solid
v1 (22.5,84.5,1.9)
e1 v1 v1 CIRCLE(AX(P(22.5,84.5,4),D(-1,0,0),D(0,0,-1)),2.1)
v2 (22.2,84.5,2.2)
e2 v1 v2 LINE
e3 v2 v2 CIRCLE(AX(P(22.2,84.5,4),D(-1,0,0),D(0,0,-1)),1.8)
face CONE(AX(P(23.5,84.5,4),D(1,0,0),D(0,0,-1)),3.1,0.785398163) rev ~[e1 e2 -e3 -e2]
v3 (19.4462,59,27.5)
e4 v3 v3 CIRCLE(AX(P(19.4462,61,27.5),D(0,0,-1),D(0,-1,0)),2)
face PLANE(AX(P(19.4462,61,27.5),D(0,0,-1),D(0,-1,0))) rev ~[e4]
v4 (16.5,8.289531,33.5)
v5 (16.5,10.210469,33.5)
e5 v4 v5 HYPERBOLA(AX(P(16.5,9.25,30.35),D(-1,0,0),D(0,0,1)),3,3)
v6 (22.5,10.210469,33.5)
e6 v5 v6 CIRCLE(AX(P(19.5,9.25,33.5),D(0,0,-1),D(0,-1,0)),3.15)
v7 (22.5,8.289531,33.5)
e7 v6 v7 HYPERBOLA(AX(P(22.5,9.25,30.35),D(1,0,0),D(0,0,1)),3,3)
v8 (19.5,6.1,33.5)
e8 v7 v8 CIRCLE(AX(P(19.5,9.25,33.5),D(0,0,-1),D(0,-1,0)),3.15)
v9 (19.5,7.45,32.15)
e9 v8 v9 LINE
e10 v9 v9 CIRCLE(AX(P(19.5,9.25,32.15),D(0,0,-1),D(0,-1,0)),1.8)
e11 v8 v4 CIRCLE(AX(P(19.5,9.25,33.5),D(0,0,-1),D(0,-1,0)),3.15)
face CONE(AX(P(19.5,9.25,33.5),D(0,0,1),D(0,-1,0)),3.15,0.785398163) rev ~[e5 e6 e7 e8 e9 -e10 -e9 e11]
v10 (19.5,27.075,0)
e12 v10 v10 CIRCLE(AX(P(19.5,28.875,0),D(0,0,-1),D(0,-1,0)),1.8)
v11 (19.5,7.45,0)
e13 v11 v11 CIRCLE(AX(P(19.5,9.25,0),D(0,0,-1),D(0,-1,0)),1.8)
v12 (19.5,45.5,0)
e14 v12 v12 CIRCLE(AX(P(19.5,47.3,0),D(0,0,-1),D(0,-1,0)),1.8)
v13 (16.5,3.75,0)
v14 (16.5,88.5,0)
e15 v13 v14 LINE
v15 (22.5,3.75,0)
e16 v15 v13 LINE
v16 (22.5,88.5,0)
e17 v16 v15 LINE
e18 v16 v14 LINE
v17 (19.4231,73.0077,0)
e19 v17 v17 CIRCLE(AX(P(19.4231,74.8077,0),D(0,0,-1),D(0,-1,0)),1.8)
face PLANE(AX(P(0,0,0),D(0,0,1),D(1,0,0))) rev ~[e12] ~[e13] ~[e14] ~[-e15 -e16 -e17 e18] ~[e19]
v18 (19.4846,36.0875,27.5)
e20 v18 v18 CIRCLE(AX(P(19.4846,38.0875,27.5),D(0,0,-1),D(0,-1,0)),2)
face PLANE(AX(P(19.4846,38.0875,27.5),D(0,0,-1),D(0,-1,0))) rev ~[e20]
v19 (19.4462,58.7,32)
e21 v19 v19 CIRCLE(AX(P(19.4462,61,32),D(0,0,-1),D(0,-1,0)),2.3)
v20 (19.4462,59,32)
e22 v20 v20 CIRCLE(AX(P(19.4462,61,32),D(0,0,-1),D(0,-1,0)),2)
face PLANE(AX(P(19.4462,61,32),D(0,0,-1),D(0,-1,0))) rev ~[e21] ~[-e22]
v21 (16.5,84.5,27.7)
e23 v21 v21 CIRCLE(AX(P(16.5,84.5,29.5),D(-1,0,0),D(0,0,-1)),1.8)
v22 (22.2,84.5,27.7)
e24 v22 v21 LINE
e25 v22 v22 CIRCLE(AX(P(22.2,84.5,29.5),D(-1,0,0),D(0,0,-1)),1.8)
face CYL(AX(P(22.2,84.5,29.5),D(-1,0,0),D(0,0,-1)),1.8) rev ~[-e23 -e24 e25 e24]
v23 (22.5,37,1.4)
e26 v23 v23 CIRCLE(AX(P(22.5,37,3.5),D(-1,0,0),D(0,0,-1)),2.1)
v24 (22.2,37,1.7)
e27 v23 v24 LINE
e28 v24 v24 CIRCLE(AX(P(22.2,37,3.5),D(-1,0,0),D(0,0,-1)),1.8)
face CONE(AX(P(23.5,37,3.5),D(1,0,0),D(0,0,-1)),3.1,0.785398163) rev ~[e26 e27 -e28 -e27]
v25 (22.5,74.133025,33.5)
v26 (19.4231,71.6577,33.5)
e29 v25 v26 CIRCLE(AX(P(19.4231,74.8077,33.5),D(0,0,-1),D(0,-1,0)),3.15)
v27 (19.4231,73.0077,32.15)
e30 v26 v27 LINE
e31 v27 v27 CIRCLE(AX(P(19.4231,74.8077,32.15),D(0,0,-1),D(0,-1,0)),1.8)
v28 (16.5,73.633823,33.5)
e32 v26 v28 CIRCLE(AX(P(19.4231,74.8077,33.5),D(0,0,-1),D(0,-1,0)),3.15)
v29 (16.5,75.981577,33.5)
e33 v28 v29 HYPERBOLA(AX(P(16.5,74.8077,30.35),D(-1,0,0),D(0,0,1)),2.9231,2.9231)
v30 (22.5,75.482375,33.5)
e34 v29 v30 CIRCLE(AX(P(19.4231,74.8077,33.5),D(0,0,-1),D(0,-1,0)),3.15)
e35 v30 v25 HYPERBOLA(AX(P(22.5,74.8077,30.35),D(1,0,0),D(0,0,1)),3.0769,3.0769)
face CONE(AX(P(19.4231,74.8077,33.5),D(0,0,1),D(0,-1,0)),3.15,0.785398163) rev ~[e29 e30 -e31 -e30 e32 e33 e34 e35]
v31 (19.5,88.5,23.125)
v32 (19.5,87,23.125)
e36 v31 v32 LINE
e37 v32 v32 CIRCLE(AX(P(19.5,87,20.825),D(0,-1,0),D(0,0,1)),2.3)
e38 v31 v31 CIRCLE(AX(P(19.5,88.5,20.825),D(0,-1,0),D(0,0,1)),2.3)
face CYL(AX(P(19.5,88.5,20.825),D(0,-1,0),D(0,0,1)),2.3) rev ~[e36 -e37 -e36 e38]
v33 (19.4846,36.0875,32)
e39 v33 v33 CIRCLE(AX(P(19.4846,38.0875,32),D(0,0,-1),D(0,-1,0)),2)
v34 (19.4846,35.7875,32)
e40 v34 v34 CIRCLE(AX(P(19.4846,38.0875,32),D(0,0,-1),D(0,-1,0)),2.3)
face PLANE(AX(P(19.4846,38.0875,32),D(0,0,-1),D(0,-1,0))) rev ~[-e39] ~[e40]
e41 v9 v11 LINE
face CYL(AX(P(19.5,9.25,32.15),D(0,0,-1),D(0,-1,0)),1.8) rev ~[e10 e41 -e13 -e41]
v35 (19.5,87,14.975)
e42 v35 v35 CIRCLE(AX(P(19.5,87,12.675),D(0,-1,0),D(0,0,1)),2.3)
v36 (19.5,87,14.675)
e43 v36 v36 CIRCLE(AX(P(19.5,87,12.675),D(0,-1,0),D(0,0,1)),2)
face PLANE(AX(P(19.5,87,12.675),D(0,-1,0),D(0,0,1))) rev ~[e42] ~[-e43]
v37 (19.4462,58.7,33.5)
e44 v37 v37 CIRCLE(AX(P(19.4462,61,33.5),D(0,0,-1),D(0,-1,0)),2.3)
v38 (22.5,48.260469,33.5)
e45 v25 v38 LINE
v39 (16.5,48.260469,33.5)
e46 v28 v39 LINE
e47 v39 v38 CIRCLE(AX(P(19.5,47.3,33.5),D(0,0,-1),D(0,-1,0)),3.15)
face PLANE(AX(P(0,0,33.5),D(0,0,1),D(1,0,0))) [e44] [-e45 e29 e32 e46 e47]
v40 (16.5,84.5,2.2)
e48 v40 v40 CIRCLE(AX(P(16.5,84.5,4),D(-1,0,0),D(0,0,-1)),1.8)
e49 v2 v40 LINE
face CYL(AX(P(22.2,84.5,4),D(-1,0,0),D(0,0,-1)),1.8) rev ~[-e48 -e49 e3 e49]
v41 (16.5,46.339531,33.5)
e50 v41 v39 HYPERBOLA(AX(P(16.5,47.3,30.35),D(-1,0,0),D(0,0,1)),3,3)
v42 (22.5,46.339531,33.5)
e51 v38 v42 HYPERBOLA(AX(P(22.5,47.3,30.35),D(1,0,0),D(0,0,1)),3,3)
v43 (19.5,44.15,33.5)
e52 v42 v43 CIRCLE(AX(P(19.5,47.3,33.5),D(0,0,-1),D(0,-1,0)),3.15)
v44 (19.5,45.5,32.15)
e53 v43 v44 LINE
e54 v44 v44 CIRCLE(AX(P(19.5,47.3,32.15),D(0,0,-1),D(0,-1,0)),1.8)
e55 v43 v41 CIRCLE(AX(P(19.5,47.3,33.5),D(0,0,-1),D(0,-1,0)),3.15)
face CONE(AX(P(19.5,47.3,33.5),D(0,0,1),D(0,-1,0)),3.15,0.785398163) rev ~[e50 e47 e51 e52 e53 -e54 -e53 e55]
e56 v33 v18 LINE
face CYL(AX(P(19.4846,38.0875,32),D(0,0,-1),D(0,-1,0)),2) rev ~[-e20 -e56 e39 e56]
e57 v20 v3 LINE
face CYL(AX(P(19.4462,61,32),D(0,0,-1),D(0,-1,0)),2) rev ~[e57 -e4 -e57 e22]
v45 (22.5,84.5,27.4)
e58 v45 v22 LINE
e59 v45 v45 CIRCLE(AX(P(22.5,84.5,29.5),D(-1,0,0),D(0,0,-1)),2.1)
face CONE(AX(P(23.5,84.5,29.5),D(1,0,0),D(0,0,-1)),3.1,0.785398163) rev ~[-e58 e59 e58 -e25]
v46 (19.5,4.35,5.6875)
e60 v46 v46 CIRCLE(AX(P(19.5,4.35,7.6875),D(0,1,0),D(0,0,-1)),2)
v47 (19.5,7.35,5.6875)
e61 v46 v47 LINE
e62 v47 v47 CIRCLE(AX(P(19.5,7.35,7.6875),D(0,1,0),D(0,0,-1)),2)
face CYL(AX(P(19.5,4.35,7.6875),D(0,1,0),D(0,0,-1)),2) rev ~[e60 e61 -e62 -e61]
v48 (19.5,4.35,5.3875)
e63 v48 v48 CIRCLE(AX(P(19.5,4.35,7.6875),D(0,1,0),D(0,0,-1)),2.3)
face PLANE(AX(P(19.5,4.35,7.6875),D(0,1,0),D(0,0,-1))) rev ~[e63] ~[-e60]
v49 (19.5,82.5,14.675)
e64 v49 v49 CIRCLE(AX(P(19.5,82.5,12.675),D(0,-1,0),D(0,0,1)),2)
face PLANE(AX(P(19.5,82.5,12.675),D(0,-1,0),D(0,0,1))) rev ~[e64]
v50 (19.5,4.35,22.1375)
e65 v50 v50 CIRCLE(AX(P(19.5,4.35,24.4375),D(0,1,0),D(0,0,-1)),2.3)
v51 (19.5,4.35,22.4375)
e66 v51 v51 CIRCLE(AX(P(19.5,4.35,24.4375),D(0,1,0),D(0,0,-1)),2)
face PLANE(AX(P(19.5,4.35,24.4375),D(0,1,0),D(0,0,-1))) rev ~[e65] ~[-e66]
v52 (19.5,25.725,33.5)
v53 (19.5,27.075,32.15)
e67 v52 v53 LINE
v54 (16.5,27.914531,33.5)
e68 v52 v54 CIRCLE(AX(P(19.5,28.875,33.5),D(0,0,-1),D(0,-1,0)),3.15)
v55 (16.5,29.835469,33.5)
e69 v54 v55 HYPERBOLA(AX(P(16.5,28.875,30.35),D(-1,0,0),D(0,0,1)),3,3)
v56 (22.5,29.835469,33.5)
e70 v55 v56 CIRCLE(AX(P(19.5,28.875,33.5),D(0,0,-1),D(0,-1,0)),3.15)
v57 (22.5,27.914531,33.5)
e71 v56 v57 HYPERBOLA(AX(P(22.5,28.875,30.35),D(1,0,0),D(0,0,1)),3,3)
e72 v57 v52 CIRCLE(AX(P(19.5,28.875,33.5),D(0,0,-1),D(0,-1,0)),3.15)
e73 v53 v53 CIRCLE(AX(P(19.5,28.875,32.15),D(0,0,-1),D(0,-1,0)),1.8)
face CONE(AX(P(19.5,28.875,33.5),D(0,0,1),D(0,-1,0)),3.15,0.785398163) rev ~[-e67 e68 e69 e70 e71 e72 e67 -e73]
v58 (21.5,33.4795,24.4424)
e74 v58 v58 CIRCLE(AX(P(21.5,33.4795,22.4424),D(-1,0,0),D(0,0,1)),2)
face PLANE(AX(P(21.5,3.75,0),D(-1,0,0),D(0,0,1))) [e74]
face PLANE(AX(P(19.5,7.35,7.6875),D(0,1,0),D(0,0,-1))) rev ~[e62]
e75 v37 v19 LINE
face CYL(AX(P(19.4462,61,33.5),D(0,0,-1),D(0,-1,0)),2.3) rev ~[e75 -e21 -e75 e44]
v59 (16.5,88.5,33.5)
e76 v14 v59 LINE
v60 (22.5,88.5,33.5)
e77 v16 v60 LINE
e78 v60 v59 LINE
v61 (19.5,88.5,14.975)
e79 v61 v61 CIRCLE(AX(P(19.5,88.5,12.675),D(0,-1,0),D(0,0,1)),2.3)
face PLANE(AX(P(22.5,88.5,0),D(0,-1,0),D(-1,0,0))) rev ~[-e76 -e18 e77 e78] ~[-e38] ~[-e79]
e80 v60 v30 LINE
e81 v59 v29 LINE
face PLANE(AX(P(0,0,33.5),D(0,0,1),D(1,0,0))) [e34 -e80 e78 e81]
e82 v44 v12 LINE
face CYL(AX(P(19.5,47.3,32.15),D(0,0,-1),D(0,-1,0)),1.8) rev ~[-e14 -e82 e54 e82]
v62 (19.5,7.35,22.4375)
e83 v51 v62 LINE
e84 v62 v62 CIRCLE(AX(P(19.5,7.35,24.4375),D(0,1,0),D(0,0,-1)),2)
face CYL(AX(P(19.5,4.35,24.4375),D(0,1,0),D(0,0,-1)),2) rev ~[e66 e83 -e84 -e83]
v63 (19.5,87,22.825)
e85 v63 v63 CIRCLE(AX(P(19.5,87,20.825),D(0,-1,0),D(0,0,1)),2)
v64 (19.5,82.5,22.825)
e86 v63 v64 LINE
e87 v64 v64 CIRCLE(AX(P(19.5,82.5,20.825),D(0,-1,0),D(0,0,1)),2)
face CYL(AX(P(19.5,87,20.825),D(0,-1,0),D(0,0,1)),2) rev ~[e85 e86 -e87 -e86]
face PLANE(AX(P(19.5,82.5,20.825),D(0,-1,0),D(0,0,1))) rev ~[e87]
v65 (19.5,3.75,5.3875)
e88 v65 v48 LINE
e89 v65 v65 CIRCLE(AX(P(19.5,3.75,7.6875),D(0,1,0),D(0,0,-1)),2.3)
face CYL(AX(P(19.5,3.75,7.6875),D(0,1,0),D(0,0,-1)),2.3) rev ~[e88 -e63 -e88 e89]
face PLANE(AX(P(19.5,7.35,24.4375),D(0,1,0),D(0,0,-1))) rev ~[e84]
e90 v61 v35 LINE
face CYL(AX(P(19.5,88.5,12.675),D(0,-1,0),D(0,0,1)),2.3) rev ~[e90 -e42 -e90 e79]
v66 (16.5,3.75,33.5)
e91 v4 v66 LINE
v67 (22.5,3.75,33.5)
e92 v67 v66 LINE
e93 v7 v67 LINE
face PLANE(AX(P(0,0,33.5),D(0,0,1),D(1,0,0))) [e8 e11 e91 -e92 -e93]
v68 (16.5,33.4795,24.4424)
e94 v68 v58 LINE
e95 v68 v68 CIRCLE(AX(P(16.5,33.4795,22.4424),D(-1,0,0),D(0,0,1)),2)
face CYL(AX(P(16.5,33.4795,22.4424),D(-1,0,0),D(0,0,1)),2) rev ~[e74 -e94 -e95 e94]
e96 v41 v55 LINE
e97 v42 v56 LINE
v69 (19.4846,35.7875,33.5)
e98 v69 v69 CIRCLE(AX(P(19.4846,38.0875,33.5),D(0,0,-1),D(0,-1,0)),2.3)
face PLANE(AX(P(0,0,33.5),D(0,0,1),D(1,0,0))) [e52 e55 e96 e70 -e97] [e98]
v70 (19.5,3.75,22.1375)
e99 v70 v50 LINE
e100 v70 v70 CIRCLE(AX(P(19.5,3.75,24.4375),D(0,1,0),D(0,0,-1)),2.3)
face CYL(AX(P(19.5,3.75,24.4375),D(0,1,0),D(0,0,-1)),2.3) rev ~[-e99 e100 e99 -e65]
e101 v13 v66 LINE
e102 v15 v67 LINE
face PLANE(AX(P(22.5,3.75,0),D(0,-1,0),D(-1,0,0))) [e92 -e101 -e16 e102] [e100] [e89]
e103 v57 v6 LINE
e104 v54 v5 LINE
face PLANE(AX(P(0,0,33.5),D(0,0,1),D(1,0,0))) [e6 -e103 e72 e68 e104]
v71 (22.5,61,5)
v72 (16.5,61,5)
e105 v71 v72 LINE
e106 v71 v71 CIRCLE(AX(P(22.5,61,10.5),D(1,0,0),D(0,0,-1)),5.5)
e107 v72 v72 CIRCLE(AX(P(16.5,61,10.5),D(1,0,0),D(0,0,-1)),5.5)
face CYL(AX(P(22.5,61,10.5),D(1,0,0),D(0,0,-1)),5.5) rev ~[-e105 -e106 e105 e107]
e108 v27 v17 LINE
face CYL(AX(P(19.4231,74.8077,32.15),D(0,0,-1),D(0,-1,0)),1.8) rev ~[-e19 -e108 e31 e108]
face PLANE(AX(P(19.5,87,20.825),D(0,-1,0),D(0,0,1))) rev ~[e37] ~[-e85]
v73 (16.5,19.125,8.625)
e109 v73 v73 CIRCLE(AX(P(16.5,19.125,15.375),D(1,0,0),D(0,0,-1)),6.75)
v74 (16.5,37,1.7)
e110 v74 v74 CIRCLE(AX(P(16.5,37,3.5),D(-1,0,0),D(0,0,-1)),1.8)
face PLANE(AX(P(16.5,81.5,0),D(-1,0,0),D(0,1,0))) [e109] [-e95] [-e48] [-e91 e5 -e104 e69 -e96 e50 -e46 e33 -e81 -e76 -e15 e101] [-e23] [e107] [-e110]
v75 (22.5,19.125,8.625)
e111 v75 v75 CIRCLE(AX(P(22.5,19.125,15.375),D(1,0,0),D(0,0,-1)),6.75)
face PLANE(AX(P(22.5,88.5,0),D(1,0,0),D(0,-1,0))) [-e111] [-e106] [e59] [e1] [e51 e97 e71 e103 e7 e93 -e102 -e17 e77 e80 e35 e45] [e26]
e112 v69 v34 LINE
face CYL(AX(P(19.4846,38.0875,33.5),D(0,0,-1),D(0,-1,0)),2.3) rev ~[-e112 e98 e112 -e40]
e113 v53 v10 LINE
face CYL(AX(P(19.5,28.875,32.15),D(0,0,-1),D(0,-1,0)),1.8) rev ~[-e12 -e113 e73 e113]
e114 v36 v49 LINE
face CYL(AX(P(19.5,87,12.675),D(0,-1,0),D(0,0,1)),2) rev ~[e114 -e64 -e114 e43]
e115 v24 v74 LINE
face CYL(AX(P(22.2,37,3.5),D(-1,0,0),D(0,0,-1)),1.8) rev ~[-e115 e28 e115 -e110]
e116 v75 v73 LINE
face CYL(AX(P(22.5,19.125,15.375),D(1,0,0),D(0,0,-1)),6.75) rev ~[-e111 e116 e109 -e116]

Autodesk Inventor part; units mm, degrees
ref_plane "YZ Plane" through (0, 0, 0) normal (1, 0, 0) x (0, 1, 0)
ref_plane "XZ Plane" through (0, 0, 0) normal (0, 1, 0) x (-1, 0, 0)
ref_plane "Work Plane1" through (0, 0, 0) normal (0, 0, 1) x (1, 0, 0)
sketch "Sketch1" plane through (0, 0, 0) normal (0, 0, 1) x (1, 0, 0)
  line L0 (23.5, 88.5) -> (-23.5, 88.5) projected
  line L1 (-23.5, 88.5) -> (-23.5, 36.5) projected
  line L2 (-26.5, 33.5) -> (-89, 33.5) projected
  line L3 (-89, 33.5) -> (-89, -72.5) projected
  line L4 (-89, -72.5) -> (-77, -72.5) projected
  line L5 (-74, -75.5) -> (-74, -93.5) projected
  line L6 (-74, -93.5) -> (74, -93.5) projected
  line L7 (74, -93.5) -> (74, -75.5) projected
  line L8 (77, -72.5) -> (89, -72.5) projected
  line L9 (89, -72.5) -> (89, 33.5) projected
  line L10 (89, 33.5) -> (26.5, 33.5) projected
  line L11 (23.5, 36.5) -> (23.5, 88.5) projected
  line L12 (-4.5, 81.5) -> (-4.5, 36.5) projected
  line L13 (-7.5, 33.5) -> (-13.5, 33.5) projected
  line L14 (-16.5, 36.5) -> (-16.5, 81.5) projected
  line L15 (-13.5, 84.5) -> (-7.5, 84.5) projected
  line L16 (16.5, 81.5) -> (16.5, 36.5) projected
  line L17 (13.5, 33.5) -> (7.5, 33.5) projected
  line L18 (4.5, 36.5) -> (4.5, 81.5) projected
  line L19 (7.5, 84.5) -> (13.5, 84.5) projected
  line L20 (16.5, 88.5) -> (22.5, 88.5)
  line L21 (22.5, 88.5) -> (22.5, 3.75)
  line L22 (22.5, 3.75) -> (16.5, 3.75)
  line L23 (16.5, 3.75) -> (16.5, 88.5)
  line L24 (59.9, 4.75) -> (32.2, 4.75)
  arc A0 (13.5, 33.5) -> (16.5, 36.5) centre (13.5, 36.5) ccw projected
  arc A1 (4.5, 36.5) -> (7.5, 33.5) centre (7.5, 36.5) ccw projected
  arc A2 (7.5, 84.5) -> (4.5, 81.5) centre (7.5, 81.5) ccw projected
  arc A3 (16.5, 81.5) -> (13.5, 84.5) centre (13.5, 81.5) ccw projected
  arc A4 (-4.5, 81.5) -> (-7.5, 84.5) centre (-7.5, 81.5) ccw projected
  arc A5 (-7.5, 33.5) -> (-4.5, 36.5) centre (-7.5, 36.5) ccw projected
  arc A6 (-16.5, 36.5) -> (-13.5, 33.5) centre (-13.5, 36.5) ccw projected
  arc A7 (-13.5, 84.5) -> (-16.5, 81.5) centre (-13.5, 81.5) ccw projected
  arc A8 (-26.5, 33.5) -> (-23.5, 36.5) centre (-26.5, 36.5) ccw projected
  arc A9 (-74, -75.5) -> (-77, -72.5) centre (-77, -75.5) ccw projected
  arc A10 (77, -72.5) -> (74, -75.5) centre (77, -75.5) ccw projected
  arc A11 (23.5, 36.5) -> (26.5, 33.5) centre (26.5, 36.5) ccw projected
  point P0 (0, 0)
  dimension "d0" = 1
  dimension "d1" = 1
ref_plane "Work Plane2" through (-89, -40.3889, 33.5) normal (0, 0, 1) x (1, 0, 0)
extrude "Extrusion1" add sketch "Sketch1" along normal up to surface (33.5 mm away) contours L21 L22 L23 L16 L0
sketch "Sketch2" plane through (22.5, 3.75, 0) normal (1, 0, 0) x (0, 0, -1)
  circle A0 centre (-15.375, 15.375) radius 6.75 projected
  circle A1 centre (-10.5, 57.25) radius 5.5 projected
  point P0 (0, -3.75)
  dimension "d8" = 11
extrude "Extrusion2" cut sketch "Sketch2" against normal up to next
sketch "Sketch3" plane through (16.5, 3.75, 0) normal (-1, 0, 0) x (0, 0, 1)
  circle A0 centre (22.4424, 29.7295) radius 2 projected
  point P0 (0, -3.75)
extrude "Extrusion3" cut sketch "Sketch3" against normal blind 5
ref_plane "Work Plane3" through (23.5, 3.75, 0) normal (1, 0, 0) x (0, 0, -1)
sketch "Sketch4" plane through (23.5, 3.75, 0) normal (1, 0, 0) x (0, 0, -1)
  circle A0 centre (-29.5, 80.75) radius 1.8 projected
  circle A1 centre (-3.5, 33.25) radius 1.8 projected
  circle A2 centre (-4, 80.75) radius 1.8 projected
  point P0 (0, -3.75)
hole "Hole1" at (23.5, 37, 3.5) at (23.5, 84.5, 4) at (23.5, 84.5, 29.5) direction (-1, 0, 0) diameter 3.6 end through all countersink diameter 6.2 countersink angle 90 clearance for "Countersunk Flat Head Screw ISO 2009/7046" size "M3" standard "ISO"
sketch "Sketch5" plane through (16.5, 3.75, 33.5) normal (0, 0, 1) x (1, 0, 0)
  circle A0 centre (-36, 5.5) radius 1.8 projected
  circle A1 centre (-36, 25.125) radius 1.8 projected
  circle A2 centre (-36, 43.55) radius 1.8 projected
  circle A3 centre (-35.9231, 71.0577) radius 1.8 projected
  circle A4 centre (-16.5, 44.3) radius 3.3 projected
  circle A5 centre (-16.5, 15.375) radius 3.3 projected
  circle A6 centre (-16.5, 69.95) radius 3.3 projected
  line L0 (-12, 0) -> (-21, 0) projected
  line L1 (-12, 84.75) -> (-12, 0) projected
  line L2 (-21, 84.75) -> (-12, 84.75) projected
  line L3 (-21, 0) -> (-21, 84.75) projected
  line L4 (-16.5, 0) -> (-16.5, 84.75)
  circle A7 centre (3, 5.5) radius 1.8
  circle A8 centre (3, 25.125) radius 1.8
  circle A9 centre (3, 43.55) radius 1.8
  circle A10 centre (2.9231, 71.0577) radius 1.8
  circle A11 centre (-16.5, 29.4896) radius 2.3 projected
  circle A12 centre (-16.5, 57.25) radius 2.3 projected
  point P0 (-16.5, -3.75)
hole "Hole2" at (19.5, 9.25, 33.5) at (19.5, 28.875, 33.5) at (19.5, 47.3, 33.5) at (19.4231, 74.8077, 33.5) direction (0, 0, -1) diameter 3.6 end through all countersink diameter 6.3 countersink angle 90 clearance for "Countersunk Flat Head Screw ISO 2009/7046" size "M3" standard "ISO"
sketch "Sketch6" plane through (16.5, 3.75, 0) normal (0, -1, 0) x (1, 0, 0)
  line L0 (6, 33.5) -> (0, 33.5) projected
  line L1 (0, 0) -> (0, 33.5) projected
  line L2 (0, 0) -> (6, 0) projected
  line L3 (6, 0) -> (6, 33.5) projected
  line L4 (0, 8.625) -> (0, 22.125) projected
  line L5 (0, 15.375) -> (6, 15.375)
  line L6 (6, 16) -> (6, 5) projected
  line L7 (0, 33.5) -> (6, 15.375)
  line L8 (0, 0) -> (0, 33.5) projected
  line L9 (0, 0) -> (6, 15.375)
  line L10 (6, 0) -> (0, 15.375)
  line L11 (0, 15.375) -> (6, 33.5)
  point P0 (-16.5, 0)
  point P1 (3, 24.4375)
  point P2 (3, 7.6875)
hole "Hole3" at (19.5, 3.75, 24.4375) at (19.5, 3.75, 7.6875) direction (0, 1, 0) diameter 4 depth 3.6 counterbore diameter 4.6 counterbore depth 0.6
sketch "Sketch7" plane through (16.5, 88.5, 0) normal (0, 1, 0) x (1, 0, 0)
  line L0 (0, -33.5) -> (6, -33.5) projected
  line L1 (6, 0) -> (6, -33.5) projected
  line L2 (6, 0) -> (0, 0) projected
  line L3 (0, 0) -> (0, -33.5) projected
  circle A0 centre (-16.5, -12.675) radius 2 projected
  circle A1 centre (-16.5, -20.825) radius 2 projected
  line L4 (-16.5, -20.825) -> (6, -20.825)
  line L5 (-16.5, -12.675) -> (6, -12.675)
  line L6 (6, -5) -> (6, -16) projected
  point P0 (-16.5, 0)
  point P1 (3, -20.825)
  point P2 (3, -12.675)
hole "Hole4" at (19.5, 88.5, 20.825) at (19.5, 88.5, 12.675) direction (0, -1, 0) diameter 4 depth 6 counterbore diameter 4.6 counterbore depth 1.5
sketch "Sketch8" plane through (19.5, 47.3, 33.5) normal (0, 0, 1) x (1, 0, 0)
  circle A0 centre (-39, -9.2125) radius 2.3 projected
  circle A1 centre (-39, 13.7) radius 2.3 projected
  arc A2 (3, 0.9605) -> (-3, 0.9605) centre (0, 0) ccw projected
  line L0 (3, 26.8331) -> (3, 0.9605) projected
  arc A3 (-3, 26.3338) -> (3, 26.8331) centre (-0.0769, 27.5077) ccw projected
  line L1 (-3, 0.9605) -> (-3, 26.3338) projected
  arc A4 (-3, -0.9605) -> (3, -0.9605) centre (0, 0) ccw projected
  line L2 (-3, -17.4645) -> (-3, -0.9605) projected
  arc A5 (3, -17.4645) -> (-3, -17.4645) centre (0, -18.425) ccw projected
  line L3 (3, -0.9605) -> (3, -17.4645) projected
  line L4 (-39, 13.7) -> (3, 13.7)
  line L5 (3, 19.2) -> (3, 8.2) projected
  line L6 (-39, -9.2125) -> (3, -9.2125)
  circle A6 centre (0, -18.425) radius 1.8 projected
  line L7 (0, -18.425) -> (-0.0769, 27.5077)
  point P0 (-19.5, -47.3)
  point P1 (-0.0538, 13.7)
  point P2 (-0.0154, -9.2125)
hole "Hole5" at (19.4462, 61, 33.5) at (19.4846, 38.0875, 33.5) direction (0, 0, -1) diameter 4 depth 6 counterbore diameter 4.6 counterbore depth 1.5
properties part number "left_gear_holder"
